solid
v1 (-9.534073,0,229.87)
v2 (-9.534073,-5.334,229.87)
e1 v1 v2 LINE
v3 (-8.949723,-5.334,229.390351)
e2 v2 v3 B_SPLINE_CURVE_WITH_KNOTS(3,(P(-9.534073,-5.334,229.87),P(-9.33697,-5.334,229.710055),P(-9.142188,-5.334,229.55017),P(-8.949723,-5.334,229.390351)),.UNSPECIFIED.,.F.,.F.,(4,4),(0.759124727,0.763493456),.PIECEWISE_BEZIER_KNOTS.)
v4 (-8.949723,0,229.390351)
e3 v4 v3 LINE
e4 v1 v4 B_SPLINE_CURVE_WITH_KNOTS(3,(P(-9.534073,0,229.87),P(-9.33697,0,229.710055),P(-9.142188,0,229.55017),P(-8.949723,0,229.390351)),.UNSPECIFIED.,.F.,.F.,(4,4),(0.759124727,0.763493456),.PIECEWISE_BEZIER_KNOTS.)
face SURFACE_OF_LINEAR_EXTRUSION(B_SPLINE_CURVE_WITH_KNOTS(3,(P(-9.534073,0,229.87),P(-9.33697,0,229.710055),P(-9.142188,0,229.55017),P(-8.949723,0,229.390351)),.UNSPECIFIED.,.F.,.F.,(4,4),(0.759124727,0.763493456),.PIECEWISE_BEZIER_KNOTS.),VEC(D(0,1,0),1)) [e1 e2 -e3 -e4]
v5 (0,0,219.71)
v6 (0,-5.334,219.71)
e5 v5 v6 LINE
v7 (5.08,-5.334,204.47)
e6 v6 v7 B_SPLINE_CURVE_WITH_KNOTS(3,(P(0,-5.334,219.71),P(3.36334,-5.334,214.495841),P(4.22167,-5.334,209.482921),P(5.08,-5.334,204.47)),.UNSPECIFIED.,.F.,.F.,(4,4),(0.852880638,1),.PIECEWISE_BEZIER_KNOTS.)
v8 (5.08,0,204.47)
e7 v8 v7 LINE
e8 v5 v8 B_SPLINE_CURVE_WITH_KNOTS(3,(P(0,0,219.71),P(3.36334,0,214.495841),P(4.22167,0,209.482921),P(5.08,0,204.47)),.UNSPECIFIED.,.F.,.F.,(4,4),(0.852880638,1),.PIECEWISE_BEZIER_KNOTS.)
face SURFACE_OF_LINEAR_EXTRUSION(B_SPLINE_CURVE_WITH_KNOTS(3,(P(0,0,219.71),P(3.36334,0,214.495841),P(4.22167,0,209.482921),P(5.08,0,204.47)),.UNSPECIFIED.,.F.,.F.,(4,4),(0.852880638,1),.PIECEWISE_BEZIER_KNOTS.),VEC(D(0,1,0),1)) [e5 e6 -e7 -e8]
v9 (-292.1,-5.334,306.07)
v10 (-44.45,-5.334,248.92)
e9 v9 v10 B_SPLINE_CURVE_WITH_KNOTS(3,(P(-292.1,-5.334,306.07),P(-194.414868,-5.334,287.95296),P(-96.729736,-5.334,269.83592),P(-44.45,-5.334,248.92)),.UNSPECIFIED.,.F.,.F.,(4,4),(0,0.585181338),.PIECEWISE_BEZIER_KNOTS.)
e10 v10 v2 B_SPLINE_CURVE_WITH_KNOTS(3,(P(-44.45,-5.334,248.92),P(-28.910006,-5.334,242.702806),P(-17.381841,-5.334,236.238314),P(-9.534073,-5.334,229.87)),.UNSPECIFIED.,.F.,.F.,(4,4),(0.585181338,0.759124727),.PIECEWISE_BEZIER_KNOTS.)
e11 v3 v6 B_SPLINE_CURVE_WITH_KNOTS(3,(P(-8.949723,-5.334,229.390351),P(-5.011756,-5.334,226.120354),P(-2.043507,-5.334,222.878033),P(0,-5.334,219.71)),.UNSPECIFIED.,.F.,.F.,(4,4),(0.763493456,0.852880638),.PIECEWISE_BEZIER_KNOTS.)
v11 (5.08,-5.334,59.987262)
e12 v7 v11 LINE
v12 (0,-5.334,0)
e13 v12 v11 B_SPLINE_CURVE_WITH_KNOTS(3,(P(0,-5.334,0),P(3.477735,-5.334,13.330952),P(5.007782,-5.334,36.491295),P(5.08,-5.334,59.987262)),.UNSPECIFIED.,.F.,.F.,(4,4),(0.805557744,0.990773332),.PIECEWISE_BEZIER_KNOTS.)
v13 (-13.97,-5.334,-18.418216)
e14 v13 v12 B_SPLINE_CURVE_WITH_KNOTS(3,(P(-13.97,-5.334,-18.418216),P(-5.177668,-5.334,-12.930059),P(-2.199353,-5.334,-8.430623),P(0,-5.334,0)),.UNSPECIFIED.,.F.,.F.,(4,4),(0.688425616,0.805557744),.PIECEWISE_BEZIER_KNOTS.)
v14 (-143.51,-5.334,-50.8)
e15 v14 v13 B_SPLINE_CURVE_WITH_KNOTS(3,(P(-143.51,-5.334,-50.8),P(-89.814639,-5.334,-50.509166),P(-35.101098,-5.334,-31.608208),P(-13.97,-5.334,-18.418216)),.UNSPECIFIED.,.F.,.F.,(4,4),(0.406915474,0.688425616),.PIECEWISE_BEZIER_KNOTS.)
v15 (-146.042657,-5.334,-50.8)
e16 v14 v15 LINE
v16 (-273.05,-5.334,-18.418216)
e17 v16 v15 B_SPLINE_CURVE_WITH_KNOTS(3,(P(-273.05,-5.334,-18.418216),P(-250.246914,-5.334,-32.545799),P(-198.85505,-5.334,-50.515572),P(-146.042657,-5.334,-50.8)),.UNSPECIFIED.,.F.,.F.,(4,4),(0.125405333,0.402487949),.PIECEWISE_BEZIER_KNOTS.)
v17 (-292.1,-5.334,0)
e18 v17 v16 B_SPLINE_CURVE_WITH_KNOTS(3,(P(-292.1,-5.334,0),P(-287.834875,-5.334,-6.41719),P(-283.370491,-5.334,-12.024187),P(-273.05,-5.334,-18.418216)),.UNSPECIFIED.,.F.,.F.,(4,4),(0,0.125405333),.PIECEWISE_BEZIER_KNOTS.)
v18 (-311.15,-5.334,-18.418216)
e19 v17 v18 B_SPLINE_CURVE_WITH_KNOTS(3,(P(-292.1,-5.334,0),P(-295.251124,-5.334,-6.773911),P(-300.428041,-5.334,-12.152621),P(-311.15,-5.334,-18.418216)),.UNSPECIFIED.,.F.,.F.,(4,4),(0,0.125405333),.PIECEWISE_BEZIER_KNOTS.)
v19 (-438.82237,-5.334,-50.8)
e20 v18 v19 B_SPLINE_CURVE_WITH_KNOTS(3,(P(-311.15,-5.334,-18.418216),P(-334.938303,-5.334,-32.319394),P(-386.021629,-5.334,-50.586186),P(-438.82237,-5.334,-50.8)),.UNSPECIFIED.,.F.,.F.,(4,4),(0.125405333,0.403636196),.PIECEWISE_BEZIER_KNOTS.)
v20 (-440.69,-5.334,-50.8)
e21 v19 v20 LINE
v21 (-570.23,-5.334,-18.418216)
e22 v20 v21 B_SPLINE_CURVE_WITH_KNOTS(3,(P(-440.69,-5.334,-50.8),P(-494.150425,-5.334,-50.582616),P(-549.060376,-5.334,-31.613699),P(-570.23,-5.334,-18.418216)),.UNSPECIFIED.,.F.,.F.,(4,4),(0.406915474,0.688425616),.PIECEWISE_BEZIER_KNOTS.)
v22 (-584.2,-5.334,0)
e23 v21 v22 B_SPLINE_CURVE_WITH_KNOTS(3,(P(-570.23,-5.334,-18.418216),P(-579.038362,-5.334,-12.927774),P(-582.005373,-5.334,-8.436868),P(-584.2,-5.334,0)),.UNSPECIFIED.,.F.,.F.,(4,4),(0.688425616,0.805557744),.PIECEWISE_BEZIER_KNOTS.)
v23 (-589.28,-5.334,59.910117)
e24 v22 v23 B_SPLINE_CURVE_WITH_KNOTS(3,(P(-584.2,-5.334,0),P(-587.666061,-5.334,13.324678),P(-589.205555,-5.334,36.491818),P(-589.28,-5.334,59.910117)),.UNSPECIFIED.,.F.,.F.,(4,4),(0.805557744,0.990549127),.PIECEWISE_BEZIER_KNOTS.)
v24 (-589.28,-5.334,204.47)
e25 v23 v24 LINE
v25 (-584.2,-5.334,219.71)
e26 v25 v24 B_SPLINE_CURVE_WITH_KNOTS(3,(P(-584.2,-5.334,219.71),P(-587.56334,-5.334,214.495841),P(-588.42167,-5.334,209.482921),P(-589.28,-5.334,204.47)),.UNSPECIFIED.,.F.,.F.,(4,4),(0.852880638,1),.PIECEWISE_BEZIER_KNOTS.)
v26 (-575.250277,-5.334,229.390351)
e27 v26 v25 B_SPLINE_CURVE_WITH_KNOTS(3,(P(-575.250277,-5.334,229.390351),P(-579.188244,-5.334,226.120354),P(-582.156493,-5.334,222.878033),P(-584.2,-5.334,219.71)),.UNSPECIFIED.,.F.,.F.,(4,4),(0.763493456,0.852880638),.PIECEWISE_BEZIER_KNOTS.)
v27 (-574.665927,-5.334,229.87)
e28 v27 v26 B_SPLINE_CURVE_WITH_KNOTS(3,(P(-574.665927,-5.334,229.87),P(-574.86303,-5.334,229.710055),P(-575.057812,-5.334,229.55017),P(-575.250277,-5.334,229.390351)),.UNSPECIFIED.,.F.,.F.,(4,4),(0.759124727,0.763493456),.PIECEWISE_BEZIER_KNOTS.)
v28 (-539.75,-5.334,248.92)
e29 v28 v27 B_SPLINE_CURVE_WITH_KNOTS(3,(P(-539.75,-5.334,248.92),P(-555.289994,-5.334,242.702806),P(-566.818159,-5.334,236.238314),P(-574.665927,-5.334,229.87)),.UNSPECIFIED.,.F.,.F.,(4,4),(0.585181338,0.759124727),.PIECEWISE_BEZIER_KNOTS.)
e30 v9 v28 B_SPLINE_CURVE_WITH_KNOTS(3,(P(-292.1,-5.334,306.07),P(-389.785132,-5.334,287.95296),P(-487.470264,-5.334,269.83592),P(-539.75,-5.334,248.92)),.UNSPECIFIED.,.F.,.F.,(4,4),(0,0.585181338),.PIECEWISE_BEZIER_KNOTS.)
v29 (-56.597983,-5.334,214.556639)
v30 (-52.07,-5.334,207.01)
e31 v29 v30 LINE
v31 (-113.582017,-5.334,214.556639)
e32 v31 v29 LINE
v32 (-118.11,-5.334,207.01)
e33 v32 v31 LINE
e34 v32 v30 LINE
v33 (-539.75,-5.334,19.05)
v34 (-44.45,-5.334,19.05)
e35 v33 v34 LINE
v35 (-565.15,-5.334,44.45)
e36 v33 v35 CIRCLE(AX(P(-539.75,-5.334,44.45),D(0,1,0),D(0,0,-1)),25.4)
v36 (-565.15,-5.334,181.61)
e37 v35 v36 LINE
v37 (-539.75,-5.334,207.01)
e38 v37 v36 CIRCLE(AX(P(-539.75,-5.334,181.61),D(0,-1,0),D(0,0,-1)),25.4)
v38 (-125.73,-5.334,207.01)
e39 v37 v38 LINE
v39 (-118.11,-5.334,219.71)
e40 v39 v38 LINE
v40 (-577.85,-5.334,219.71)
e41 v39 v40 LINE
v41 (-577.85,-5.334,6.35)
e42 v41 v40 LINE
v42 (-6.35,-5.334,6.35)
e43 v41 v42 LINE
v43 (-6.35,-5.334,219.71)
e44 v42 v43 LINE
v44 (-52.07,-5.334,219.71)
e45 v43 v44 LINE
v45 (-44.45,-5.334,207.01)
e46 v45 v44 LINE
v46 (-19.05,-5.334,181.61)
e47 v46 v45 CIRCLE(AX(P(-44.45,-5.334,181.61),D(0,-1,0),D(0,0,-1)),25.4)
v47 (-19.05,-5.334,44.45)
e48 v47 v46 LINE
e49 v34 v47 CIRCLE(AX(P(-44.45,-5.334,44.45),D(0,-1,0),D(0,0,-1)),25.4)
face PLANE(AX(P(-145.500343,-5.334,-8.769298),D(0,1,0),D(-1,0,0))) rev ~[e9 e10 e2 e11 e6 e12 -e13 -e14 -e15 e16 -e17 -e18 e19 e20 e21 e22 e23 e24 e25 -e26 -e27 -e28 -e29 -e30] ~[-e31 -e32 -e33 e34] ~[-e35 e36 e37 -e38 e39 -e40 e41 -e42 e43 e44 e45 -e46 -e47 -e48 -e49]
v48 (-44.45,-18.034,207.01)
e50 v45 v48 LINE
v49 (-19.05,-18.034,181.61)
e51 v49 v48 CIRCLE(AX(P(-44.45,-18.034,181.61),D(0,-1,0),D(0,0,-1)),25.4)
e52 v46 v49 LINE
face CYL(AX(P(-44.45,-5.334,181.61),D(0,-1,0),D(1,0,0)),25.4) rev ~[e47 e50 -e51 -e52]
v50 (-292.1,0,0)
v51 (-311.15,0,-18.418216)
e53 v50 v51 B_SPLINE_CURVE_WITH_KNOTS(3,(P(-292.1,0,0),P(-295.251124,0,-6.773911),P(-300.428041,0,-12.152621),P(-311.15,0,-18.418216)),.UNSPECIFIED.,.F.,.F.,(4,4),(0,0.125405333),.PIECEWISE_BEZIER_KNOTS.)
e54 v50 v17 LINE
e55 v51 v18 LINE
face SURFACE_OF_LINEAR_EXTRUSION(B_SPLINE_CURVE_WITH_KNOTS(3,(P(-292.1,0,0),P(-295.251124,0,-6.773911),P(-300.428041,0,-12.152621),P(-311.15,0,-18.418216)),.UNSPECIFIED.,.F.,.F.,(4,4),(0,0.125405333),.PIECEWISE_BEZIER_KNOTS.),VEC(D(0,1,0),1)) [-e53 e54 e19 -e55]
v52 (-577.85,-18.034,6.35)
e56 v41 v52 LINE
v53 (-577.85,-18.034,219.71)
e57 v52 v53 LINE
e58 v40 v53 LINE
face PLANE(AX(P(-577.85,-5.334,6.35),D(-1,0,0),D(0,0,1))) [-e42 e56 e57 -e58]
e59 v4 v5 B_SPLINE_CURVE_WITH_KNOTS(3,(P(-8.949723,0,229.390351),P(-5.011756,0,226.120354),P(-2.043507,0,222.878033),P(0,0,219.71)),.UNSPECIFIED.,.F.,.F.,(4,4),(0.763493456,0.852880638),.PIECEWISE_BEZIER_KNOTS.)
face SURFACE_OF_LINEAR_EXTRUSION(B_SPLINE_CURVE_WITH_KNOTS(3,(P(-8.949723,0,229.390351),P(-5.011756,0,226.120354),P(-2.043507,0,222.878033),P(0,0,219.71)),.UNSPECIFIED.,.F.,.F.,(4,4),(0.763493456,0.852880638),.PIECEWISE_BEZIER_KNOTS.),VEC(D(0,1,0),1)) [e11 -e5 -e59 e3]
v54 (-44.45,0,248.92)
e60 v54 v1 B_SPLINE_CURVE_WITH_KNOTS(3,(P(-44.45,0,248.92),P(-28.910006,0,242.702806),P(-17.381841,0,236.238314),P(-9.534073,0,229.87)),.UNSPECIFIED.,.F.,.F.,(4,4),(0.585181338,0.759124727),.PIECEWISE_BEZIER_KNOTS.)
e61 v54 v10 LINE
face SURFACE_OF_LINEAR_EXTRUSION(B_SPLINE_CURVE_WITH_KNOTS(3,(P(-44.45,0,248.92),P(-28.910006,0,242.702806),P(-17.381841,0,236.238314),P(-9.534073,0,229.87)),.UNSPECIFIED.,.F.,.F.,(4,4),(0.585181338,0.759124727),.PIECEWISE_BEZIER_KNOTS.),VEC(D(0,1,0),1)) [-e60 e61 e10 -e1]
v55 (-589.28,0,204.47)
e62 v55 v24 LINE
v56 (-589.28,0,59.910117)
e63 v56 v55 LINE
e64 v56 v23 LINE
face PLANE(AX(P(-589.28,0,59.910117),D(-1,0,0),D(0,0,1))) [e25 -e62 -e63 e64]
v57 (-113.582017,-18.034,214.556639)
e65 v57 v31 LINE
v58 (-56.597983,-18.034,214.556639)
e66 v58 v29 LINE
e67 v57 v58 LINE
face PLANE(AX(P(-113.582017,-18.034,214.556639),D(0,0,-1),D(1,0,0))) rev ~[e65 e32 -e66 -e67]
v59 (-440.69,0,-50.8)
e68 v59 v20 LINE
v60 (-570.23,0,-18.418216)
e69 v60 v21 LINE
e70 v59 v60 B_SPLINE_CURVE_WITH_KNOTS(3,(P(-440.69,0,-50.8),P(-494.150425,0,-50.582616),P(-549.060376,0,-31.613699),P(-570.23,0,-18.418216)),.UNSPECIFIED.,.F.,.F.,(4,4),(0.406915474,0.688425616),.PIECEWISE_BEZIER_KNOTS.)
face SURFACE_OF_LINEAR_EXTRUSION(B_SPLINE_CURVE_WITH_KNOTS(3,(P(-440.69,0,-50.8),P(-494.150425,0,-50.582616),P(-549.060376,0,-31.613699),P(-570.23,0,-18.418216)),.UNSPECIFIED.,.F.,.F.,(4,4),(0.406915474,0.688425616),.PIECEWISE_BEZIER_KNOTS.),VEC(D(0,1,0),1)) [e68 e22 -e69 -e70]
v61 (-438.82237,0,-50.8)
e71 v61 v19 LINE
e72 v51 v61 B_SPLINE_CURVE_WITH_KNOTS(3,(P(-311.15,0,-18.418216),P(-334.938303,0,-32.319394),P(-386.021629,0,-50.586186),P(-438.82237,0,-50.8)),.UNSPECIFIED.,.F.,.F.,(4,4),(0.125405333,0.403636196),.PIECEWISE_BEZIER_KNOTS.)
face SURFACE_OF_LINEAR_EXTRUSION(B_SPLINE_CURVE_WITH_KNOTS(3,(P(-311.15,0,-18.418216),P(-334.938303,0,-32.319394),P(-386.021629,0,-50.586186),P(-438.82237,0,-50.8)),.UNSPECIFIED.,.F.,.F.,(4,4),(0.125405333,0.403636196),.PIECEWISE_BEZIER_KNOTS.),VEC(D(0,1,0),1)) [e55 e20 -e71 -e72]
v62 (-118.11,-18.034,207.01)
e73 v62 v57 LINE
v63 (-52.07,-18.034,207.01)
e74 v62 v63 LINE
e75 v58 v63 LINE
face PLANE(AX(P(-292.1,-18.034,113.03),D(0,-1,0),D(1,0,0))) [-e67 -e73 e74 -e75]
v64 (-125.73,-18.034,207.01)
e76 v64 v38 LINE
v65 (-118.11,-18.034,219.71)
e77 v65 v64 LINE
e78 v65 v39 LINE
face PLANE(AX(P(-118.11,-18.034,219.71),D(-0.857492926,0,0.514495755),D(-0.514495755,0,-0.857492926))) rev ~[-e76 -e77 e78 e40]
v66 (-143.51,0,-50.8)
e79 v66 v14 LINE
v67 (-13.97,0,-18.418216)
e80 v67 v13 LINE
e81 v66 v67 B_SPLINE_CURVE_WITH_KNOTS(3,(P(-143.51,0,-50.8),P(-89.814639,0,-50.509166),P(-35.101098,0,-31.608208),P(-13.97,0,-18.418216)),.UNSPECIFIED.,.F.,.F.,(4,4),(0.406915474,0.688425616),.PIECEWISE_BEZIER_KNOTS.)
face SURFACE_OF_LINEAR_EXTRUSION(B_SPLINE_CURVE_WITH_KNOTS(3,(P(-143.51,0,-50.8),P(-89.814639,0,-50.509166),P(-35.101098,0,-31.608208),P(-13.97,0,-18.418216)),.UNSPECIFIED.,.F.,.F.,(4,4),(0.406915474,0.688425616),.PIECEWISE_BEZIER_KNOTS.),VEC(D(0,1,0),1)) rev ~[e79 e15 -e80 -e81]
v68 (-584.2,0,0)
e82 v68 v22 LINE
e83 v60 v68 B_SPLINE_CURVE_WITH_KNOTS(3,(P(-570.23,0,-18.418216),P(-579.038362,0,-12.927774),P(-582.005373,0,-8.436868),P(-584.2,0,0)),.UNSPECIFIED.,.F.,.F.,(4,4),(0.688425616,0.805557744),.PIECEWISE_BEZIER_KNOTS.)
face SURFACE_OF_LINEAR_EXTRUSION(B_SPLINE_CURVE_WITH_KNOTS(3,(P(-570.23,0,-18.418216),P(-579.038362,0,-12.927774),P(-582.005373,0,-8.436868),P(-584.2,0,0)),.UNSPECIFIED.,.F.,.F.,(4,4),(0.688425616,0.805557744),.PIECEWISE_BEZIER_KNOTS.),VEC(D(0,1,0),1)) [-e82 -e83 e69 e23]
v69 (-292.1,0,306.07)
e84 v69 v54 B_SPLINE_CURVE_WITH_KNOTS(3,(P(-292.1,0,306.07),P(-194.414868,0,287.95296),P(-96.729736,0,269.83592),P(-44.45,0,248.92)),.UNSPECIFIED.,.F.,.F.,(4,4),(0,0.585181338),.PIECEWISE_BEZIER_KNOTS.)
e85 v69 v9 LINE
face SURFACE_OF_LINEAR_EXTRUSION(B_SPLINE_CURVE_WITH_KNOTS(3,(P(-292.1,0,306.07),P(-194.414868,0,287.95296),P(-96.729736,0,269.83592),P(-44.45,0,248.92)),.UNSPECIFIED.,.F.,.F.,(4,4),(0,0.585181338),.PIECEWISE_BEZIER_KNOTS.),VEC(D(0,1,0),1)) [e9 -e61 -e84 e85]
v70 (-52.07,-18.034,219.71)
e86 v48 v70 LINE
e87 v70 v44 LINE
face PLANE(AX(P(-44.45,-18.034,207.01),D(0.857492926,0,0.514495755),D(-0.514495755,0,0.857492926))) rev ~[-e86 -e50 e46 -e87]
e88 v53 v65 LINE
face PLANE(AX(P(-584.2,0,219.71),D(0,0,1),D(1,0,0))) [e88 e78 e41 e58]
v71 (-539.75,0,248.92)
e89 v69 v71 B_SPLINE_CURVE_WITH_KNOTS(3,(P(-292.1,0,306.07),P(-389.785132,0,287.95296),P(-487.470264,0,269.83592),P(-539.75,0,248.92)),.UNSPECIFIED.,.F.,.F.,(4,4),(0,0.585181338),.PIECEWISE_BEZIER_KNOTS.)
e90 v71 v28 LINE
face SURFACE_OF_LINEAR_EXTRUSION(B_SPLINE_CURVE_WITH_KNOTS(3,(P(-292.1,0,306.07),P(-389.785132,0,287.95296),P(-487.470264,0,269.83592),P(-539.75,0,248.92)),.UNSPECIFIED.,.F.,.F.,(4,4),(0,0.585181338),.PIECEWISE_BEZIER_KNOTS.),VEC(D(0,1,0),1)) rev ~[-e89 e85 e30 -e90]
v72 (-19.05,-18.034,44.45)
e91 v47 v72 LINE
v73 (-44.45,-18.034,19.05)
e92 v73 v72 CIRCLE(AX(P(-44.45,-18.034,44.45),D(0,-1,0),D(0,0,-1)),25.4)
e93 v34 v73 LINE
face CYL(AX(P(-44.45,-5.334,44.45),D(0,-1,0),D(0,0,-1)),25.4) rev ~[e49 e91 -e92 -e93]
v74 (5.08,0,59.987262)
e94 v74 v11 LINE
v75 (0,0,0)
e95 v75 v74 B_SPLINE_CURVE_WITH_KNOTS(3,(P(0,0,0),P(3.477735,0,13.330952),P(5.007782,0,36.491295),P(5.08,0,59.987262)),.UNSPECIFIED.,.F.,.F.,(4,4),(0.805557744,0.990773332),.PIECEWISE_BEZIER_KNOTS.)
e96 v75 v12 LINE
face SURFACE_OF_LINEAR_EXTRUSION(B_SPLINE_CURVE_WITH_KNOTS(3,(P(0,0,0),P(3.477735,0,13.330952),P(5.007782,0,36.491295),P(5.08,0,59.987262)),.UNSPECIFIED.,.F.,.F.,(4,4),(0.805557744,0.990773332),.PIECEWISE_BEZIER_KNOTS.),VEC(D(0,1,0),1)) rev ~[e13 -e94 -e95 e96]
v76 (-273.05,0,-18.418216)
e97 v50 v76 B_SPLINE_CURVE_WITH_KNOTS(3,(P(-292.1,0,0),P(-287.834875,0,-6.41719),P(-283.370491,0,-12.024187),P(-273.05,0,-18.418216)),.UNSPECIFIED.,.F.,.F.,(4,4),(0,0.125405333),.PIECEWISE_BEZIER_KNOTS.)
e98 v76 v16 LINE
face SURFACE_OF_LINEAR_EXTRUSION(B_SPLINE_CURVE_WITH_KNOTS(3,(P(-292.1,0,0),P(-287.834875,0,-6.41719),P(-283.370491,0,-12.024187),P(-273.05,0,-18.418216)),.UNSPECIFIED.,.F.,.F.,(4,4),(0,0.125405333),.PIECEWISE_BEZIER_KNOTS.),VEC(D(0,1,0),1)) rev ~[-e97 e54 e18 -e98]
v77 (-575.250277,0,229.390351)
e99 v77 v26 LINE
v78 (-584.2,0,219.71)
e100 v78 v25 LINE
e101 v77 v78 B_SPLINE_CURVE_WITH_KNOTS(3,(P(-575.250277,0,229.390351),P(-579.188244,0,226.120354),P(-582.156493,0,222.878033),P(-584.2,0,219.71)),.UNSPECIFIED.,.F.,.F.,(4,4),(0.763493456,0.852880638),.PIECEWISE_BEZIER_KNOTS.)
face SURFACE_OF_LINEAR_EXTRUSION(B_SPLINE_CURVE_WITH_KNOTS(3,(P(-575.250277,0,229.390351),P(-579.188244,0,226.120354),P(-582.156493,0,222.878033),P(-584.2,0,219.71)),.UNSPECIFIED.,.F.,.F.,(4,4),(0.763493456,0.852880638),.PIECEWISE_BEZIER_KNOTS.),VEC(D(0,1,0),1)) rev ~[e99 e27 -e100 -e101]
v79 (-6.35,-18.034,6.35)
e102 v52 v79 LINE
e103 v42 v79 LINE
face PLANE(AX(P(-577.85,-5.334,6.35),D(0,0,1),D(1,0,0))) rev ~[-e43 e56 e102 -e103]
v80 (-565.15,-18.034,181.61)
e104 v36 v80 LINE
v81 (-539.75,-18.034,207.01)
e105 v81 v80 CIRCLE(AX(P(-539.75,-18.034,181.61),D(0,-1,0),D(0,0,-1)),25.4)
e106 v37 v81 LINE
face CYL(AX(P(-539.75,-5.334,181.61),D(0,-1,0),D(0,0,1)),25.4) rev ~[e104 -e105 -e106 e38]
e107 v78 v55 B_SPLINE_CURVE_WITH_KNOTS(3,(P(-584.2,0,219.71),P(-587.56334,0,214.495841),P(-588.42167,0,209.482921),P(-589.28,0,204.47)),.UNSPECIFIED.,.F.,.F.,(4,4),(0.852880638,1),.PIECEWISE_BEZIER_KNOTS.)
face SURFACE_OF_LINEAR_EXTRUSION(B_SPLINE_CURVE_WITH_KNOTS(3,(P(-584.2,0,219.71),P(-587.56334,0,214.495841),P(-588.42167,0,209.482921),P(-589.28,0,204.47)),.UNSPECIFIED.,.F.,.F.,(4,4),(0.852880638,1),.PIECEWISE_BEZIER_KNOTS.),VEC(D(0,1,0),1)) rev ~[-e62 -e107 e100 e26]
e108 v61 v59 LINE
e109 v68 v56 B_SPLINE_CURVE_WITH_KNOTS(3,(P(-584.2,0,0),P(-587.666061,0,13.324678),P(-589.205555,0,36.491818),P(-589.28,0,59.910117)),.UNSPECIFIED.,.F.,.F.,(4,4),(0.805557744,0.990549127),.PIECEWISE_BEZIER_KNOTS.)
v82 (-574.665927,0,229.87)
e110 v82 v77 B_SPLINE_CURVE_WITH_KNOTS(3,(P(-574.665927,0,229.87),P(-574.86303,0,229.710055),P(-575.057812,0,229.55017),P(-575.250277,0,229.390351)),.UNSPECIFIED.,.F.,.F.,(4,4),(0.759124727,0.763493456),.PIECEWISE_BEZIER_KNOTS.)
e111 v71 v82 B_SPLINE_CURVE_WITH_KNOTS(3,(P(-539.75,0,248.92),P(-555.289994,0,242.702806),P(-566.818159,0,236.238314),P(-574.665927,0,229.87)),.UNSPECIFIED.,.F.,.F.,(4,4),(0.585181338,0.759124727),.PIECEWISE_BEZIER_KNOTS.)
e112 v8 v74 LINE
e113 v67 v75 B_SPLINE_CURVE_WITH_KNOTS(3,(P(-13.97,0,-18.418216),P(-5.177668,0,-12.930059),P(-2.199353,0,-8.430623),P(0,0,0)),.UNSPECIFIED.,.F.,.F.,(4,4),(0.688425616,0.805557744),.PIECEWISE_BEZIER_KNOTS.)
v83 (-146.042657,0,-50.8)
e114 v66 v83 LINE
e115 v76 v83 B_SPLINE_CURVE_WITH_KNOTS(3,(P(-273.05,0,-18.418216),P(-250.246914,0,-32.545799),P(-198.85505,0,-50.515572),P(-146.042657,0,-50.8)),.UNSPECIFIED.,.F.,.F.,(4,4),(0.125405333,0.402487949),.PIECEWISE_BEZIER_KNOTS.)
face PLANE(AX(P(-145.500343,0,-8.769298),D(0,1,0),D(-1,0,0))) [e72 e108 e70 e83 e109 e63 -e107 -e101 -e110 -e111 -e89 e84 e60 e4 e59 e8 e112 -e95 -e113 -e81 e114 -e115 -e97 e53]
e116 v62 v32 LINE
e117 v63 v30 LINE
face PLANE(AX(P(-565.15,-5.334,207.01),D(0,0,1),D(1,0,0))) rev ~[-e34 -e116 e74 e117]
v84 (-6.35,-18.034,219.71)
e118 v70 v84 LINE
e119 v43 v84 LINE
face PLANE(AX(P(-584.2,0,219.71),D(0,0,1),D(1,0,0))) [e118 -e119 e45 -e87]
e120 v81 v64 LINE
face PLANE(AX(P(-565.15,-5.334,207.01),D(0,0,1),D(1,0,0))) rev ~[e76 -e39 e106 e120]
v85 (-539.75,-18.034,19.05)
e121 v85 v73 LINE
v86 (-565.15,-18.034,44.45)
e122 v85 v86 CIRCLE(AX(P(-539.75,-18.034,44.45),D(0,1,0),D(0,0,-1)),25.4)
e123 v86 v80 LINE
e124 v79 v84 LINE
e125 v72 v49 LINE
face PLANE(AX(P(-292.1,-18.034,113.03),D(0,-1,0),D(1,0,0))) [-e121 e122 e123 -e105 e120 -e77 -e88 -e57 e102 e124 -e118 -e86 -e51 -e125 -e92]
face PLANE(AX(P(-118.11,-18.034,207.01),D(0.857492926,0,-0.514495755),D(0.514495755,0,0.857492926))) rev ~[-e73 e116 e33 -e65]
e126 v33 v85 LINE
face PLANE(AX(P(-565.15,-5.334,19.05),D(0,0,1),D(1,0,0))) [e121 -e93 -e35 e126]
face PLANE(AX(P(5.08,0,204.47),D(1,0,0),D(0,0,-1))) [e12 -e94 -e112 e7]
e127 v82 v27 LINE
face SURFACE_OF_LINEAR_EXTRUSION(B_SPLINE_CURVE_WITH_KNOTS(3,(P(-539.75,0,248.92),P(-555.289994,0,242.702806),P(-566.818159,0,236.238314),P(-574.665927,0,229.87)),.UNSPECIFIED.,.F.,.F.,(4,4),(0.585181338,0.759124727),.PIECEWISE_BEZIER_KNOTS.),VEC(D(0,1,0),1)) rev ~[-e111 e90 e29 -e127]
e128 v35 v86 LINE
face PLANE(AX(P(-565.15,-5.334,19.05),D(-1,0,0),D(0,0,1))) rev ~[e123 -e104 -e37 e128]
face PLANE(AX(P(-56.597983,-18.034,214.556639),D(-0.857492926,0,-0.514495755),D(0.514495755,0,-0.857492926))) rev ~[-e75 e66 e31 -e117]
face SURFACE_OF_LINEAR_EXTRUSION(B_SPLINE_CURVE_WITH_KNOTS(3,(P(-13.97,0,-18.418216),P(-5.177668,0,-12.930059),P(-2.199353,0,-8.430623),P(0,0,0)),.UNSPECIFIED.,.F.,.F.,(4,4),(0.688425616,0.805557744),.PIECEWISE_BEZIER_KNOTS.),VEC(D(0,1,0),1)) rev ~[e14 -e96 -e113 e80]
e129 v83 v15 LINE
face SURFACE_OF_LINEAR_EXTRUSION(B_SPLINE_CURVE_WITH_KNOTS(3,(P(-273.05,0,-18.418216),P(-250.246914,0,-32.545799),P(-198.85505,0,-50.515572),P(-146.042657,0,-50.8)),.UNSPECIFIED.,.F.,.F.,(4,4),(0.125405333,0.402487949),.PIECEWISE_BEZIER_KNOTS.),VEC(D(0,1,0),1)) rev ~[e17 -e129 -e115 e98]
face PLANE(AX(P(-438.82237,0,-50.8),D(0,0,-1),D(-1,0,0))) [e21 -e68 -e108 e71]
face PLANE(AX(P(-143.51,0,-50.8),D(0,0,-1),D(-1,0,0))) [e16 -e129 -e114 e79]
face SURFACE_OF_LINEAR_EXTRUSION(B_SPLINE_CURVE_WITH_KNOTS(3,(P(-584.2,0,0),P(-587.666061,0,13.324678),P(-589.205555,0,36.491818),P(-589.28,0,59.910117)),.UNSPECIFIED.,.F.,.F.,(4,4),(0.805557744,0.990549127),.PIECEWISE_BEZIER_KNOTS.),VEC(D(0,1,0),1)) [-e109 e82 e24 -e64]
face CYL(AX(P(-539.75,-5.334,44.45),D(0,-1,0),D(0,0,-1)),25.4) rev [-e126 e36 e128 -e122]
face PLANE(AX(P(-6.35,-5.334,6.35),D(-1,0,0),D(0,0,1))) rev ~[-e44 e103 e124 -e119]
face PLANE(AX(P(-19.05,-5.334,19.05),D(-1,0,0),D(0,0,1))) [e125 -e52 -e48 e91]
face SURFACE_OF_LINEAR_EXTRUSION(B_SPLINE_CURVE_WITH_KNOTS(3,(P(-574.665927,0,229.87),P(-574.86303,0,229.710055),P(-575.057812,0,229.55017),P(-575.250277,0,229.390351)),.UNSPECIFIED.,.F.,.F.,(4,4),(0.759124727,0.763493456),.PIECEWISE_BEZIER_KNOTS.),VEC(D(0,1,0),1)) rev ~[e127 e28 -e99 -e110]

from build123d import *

# Parameters (mm, degrees)
F0_W     = 584.2
F0_H     = 219.71
F1_DEPTH = 5.334
F2_W     = 571.5
F2_H     = 213.36
F2_W_2   = 546.1
F2_H_2   = 187.96
F3_DEPTH = 12.7
F4_R     = 25.4
F6_DEPTH = 12.7
F8_DEPTH = 5.334


# Not quite as in the source:
# - a feature names something its author has since deleted; it is built from what else it names


with BuildPart() as f1:
    # F0 (on Front) → F1 (new body)
    with BuildSketch(Plane.XZ):
        with Locations((-292.1, 109.855)):
            Rectangle(F0_W, F0_H)
    extrude(amount=F1_DEPTH)

    # F2 (on face) → F3 (join)
    with BuildSketch(Plane.XZ.offset(5.334)):
        with Locations((-292.1, 113.03)):
            Rectangle(F2_W, F2_H)
        with Locations((-292.1, 113.03)):
            Rectangle(F2_W_2, F2_H_2, mode=Mode.SUBTRACT)
    extrude(amount=F3_DEPTH)

    # F4
    f4_edges = [f1.edges().sort_by_distance(p)[0] for p in [
        (-565.15, -11.684, 207.01),
        (-19.05, -11.684, 207.01),
        (-19.05, -11.684, 19.05),
        (-565.15, -11.684, 19.05),
    ]]
    fillet(f4_edges, radius=F4_R)

    # F5 (on face) → F6 (cut)
    with BuildSketch(Plane.XZ.offset(18.034)):
        Polygon((-118.11, 219.71), (-125.73, 207.01), (-118.11, 207.01), (-113.5820166854, 214.5566388576), (-110.49, 219.71), align=None)
        Polygon((-56.5979833146, 214.5566388576), (-52.07, 207.01), (-44.45, 207.01), (-52.07, 219.71), (-59.69, 219.71), align=None)
        Polygon((-59.69, 219.71), (-110.49, 219.71), (-113.5820166854, 214.5566388576), (-56.5979833146, 214.5566388576), align=None)
    extrude(amount=-F6_DEPTH, mode=Mode.SUBTRACT)

    # F7 (on face) → F8 (join)
    with BuildSketch(Plane(origin=(0, 0, 0), x_dir=(-1, 0, 0), z_dir=(0, 1, 0))):
        with BuildLine():
            Line((292.1, 0), (0, 0))
            add(Edge.make_bspline(
                [(13.97, -18.4182160117), (5.1776683434, -12.9300591082), (2.1993531585, -8.4306227348), (0, 0)],
                knots=[0.6884256157, 0.6884256157, 0.6884256157, 0.6884256157, 0.8055577438, 0.8055577438, 0.8055577438, 0.8055577438], degree=3))
            Line((13.97, -18.4182160117), (273.05, -18.4182160117))
            add(Edge.make_bspline(
                [(292.1, 0), (287.8348745006, -6.4171904537), (283.3704909948, -12.0241872437), (273.05, -18.4182160117)],
                knots=[0, 0, 0, 0, 0.1254053332, 0.1254053332, 0.1254053332, 0.1254053332], degree=3))
        make_face()
        with BuildLine():
            add(Edge.make_bspline(
                [(0, 0), (-3.4777348873, 13.330951736), (-5.0077822241, 36.49129499), (-5.08, 59.9872617497)],
                knots=[0.8055577438, 0.8055577438, 0.8055577438, 0.8055577438, 0.9907733318, 0.9907733318, 0.9907733318, 0.9907733318], degree=3))
            Line((0, 0), (0, 109.855))
            Line((0, 109.855), (-5.08, 109.855))
            Line((-5.08, 109.855), (-5.08, 63.5))
            Line((-5.08, 63.5), (-5.08, 59.9872617497))
        make_face()
        with BuildLine():
            Line((273.05, -18.4182160117), (13.97, -18.4182160117))
            add(Edge.make_bspline(
                [(143.51, -50.8), (89.8146392781, -50.5091658601), (35.101098408, -31.6082079428), (13.97, -18.4182160117)],
                knots=[0.4069154744, 0.4069154744, 0.4069154744, 0.4069154744, 0.6884256157, 0.6884256157, 0.6884256157, 0.6884256157], degree=3))
            Line((143.51, -50.8), (146.0426574413, -50.8))
            add(Edge.make_bspline(
                [(273.05, -18.4182160117), (250.2469136161, -32.545798741), (198.8550496381, -50.5155722463), (146.0426574413, -50.8)],
                knots=[0.1254053332, 0.1254053332, 0.1254053332, 0.1254053332, 0.4024879494, 0.4024879494, 0.4024879494, 0.4024879494], degree=3))
        make_face()
        with BuildLine():
            Line((584.2, 0), (292.1, 0))
            add(Edge.make_bspline(
                [(292.1, 0), (295.2511238563, -6.7739107165), (300.4280406329, -12.1526213408), (311.15, -18.4182160117)],
                knots=[0, 0, 0, 0, 0.1254053332, 0.1254053332, 0.1254053332, 0.1254053332], degree=3))
            Line((311.15, -18.4182160117), (570.23, -18.4182160117))
            add(Edge.make_bspline(
                [(570.23, -18.4182160117), (579.0383616328, -12.9277742975), (582.0053728244, -8.4368679309), (584.2, 0)],
                knots=[0.6884256157, 0.6884256157, 0.6884256157, 0.6884256157, 0.8055577438, 0.8055577438, 0.8055577438, 0.8055577438], degree=3))
        make_face()
        with BuildLine():
            Line((-5.08, 109.855), (0, 109.855))
            Line((0, 109.855), (0, 219.71))
            add(Edge.make_bspline(
                [(0, 219.71), (-3.3633398359, 214.4958413315), (-4.221669918, 209.4829206658), (-5.08, 204.47)],
                knots=[0.8528806378, 0.8528806378, 0.8528806378, 0.8528806378, 1, 1, 1, 1], degree=3))
            Line((-5.08, 204.47), (-5.08, 109.855))
        make_face()
        with BuildLine():
            Line((570.23, -18.4182160117), (311.15, -18.4182160117))
            add(Edge.make_bspline(
                [(311.15, -18.4182160117), (334.9383025593, -32.3193936455), (386.0216290424, -50.5861863086), (438.8223695347, -50.8)],
                knots=[0.1254053332, 0.1254053332, 0.1254053332, 0.1254053332, 0.4036361962, 0.4036361962, 0.4036361962, 0.4036361962], degree=3))
            Line((438.8223695347, -50.8), (440.69, -50.8))
            add(Edge.make_bspline(
                [(440.69, -50.8), (494.1504250391, -50.5826159423), (549.0603758608, -31.6136991551), (570.23, -18.4182160117)],
                knots=[0.4069154744, 0.4069154744, 0.4069154744, 0.4069154744, 0.6884256157, 0.6884256157, 0.6884256157, 0.6884256157], degree=3))
        make_face()
        with BuildLine():
            Line((584.2, 109.855), (584.2, 0))
            add(Edge.make_bspline(
                [(584.2, 0), (587.6660611317, 13.3246778013), (589.2055548561, 36.4918183962), (589.28, 59.9101174948)],
                knots=[0.8055577438, 0.8055577438, 0.8055577438, 0.8055577438, 0.9905491269, 0.9905491269, 0.9905491269, 0.9905491269], degree=3))
            Line((589.28, 59.9101174948), (589.28, 63.5))
            Line((589.28, 63.5), (589.28, 109.855))
            Line((589.28, 109.855), (584.2, 109.855))
        make_face()
        with BuildLine():
            add(Edge.make_bspline(
                [(8.9497229668, 229.3903513516), (5.0117556013, 226.1203537614), (2.0435071593, 222.8780326962), (0, 219.71)],
                knots=[0.7634934559, 0.7634934559, 0.7634934559, 0.7634934559, 0.8528806378, 0.8528806378, 0.8528806378, 0.8528806378], degree=3))
            Line((0, 219.71), (292.1, 219.71))
            Line((292.1, 219.71), (8.9497229668, 229.3903513516))
        make_face()
        with BuildLine():
            Line((584.2, 219.71), (584.2, 109.855))
            Line((584.2, 109.855), (589.28, 109.855))
            Line((589.28, 109.855), (589.28, 204.47))
            add(Edge.make_bspline(
                [(584.2, 219.71), (587.5633398359, 214.4958413315), (588.421669918, 209.4829206658), (589.28, 204.47)],
                knots=[0.8528806378, 0.8528806378, 0.8528806378, 0.8528806378, 1, 1, 1, 1], degree=3))
        make_face()
        with BuildLine():
            add(Edge.make_bspline(
                [(9.5340725562, 229.87), (9.3369695017, 229.7100546344), (9.1421880555, 229.5501699377), (8.9497229668, 229.3903513516)],
                knots=[0.759124727, 0.759124727, 0.759124727, 0.759124727, 0.7634934559, 0.7634934559, 0.7634934559, 0.7634934559], degree=3))
            Line((8.9497229668, 229.3903513516), (292.1, 219.71))
            Line((292.1, 219.71), (575.2502770332, 229.3903513516))
            add(Edge.make_bspline(
                [(574.6659274438, 229.87), (574.8630304983, 229.7100546344), (575.0578119445, 229.5501699377), (575.2502770332, 229.3903513516)],
                knots=[0.759124727, 0.759124727, 0.759124727, 0.759124727, 0.7634934559, 0.7634934559, 0.7634934559, 0.7634934559], degree=3))
            Line((574.6659274438, 229.87), (539.75, 229.87))
            Line((539.75, 229.87), (292.1, 229.87))
            Line((292.1, 229.87), (44.45, 229.87))
            Line((44.45, 229.87), (9.5340725562, 229.87))
        make_face()
        with BuildLine():
            Line((575.2502770332, 229.3903513516), (292.1, 219.71))
            Line((292.1, 219.71), (584.2, 219.71))
            add(Edge.make_bspline(
                [(575.2502770332, 229.3903513516), (579.1882443987, 226.1203537614), (582.1564928407, 222.8780326962), (584.2, 219.71)],
                knots=[0.7634934559, 0.7634934559, 0.7634934559, 0.7634934559, 0.8528806378, 0.8528806378, 0.8528806378, 0.8528806378], degree=3))
        make_face()
        with BuildLine():
            add(Edge.make_bspline(
                [(44.45, 248.92), (28.9100061464, 242.7028057711), (17.3818410687, 236.2383143168), (9.5340725562, 229.87)],
                knots=[0.5851813382, 0.5851813382, 0.5851813382, 0.5851813382, 0.759124727, 0.759124727, 0.759124727, 0.759124727], degree=3))
            Line((9.5340725562, 229.87), (44.45, 229.87))
            Line((44.45, 229.87), (44.45, 248.92))
        make_face()
        with BuildLine():
            Line((44.45, 248.92), (44.45, 229.87))
            Line((44.45, 229.87), (292.1, 229.87))
            Line((292.1, 229.87), (292.1, 306.07))
            add(Edge.make_bspline(
                [(292.1, 306.07), (194.4148678752, 287.9529601014), (96.7297357504, 269.8359202028), (44.45, 248.92)],
                knots=[0, 0, 0, 0, 0.5851813382, 0.5851813382, 0.5851813382, 0.5851813382], degree=3))
        make_face()
        with BuildLine():
            Line((539.75, 229.87), (574.6659274438, 229.87))
            add(Edge.make_bspline(
                [(539.75, 248.92), (555.2899938536, 242.7028057711), (566.8181589313, 236.2383143168), (574.6659274438, 229.87)],
                knots=[0.5851813382, 0.5851813382, 0.5851813382, 0.5851813382, 0.759124727, 0.759124727, 0.759124727, 0.759124727], degree=3))
            Line((539.75, 248.92), (539.75, 229.87))
        make_face()
        with BuildLine():
            Line((292.1, 306.07), (292.1, 229.87))
            Line((292.1, 229.87), (539.75, 229.87))
            Line((539.75, 229.87), (539.75, 248.92))
            add(Edge.make_bspline(
                [(292.1, 306.07), (389.7851321248, 287.9529601014), (487.4702642496, 269.8359202028), (539.75, 248.92)],
                knots=[0, 0, 0, 0, 0.5851813382, 0.5851813382, 0.5851813382, 0.5851813382], degree=3))
        make_face()
    extrude(amount=-F8_DEPTH)


solid = f1.part
